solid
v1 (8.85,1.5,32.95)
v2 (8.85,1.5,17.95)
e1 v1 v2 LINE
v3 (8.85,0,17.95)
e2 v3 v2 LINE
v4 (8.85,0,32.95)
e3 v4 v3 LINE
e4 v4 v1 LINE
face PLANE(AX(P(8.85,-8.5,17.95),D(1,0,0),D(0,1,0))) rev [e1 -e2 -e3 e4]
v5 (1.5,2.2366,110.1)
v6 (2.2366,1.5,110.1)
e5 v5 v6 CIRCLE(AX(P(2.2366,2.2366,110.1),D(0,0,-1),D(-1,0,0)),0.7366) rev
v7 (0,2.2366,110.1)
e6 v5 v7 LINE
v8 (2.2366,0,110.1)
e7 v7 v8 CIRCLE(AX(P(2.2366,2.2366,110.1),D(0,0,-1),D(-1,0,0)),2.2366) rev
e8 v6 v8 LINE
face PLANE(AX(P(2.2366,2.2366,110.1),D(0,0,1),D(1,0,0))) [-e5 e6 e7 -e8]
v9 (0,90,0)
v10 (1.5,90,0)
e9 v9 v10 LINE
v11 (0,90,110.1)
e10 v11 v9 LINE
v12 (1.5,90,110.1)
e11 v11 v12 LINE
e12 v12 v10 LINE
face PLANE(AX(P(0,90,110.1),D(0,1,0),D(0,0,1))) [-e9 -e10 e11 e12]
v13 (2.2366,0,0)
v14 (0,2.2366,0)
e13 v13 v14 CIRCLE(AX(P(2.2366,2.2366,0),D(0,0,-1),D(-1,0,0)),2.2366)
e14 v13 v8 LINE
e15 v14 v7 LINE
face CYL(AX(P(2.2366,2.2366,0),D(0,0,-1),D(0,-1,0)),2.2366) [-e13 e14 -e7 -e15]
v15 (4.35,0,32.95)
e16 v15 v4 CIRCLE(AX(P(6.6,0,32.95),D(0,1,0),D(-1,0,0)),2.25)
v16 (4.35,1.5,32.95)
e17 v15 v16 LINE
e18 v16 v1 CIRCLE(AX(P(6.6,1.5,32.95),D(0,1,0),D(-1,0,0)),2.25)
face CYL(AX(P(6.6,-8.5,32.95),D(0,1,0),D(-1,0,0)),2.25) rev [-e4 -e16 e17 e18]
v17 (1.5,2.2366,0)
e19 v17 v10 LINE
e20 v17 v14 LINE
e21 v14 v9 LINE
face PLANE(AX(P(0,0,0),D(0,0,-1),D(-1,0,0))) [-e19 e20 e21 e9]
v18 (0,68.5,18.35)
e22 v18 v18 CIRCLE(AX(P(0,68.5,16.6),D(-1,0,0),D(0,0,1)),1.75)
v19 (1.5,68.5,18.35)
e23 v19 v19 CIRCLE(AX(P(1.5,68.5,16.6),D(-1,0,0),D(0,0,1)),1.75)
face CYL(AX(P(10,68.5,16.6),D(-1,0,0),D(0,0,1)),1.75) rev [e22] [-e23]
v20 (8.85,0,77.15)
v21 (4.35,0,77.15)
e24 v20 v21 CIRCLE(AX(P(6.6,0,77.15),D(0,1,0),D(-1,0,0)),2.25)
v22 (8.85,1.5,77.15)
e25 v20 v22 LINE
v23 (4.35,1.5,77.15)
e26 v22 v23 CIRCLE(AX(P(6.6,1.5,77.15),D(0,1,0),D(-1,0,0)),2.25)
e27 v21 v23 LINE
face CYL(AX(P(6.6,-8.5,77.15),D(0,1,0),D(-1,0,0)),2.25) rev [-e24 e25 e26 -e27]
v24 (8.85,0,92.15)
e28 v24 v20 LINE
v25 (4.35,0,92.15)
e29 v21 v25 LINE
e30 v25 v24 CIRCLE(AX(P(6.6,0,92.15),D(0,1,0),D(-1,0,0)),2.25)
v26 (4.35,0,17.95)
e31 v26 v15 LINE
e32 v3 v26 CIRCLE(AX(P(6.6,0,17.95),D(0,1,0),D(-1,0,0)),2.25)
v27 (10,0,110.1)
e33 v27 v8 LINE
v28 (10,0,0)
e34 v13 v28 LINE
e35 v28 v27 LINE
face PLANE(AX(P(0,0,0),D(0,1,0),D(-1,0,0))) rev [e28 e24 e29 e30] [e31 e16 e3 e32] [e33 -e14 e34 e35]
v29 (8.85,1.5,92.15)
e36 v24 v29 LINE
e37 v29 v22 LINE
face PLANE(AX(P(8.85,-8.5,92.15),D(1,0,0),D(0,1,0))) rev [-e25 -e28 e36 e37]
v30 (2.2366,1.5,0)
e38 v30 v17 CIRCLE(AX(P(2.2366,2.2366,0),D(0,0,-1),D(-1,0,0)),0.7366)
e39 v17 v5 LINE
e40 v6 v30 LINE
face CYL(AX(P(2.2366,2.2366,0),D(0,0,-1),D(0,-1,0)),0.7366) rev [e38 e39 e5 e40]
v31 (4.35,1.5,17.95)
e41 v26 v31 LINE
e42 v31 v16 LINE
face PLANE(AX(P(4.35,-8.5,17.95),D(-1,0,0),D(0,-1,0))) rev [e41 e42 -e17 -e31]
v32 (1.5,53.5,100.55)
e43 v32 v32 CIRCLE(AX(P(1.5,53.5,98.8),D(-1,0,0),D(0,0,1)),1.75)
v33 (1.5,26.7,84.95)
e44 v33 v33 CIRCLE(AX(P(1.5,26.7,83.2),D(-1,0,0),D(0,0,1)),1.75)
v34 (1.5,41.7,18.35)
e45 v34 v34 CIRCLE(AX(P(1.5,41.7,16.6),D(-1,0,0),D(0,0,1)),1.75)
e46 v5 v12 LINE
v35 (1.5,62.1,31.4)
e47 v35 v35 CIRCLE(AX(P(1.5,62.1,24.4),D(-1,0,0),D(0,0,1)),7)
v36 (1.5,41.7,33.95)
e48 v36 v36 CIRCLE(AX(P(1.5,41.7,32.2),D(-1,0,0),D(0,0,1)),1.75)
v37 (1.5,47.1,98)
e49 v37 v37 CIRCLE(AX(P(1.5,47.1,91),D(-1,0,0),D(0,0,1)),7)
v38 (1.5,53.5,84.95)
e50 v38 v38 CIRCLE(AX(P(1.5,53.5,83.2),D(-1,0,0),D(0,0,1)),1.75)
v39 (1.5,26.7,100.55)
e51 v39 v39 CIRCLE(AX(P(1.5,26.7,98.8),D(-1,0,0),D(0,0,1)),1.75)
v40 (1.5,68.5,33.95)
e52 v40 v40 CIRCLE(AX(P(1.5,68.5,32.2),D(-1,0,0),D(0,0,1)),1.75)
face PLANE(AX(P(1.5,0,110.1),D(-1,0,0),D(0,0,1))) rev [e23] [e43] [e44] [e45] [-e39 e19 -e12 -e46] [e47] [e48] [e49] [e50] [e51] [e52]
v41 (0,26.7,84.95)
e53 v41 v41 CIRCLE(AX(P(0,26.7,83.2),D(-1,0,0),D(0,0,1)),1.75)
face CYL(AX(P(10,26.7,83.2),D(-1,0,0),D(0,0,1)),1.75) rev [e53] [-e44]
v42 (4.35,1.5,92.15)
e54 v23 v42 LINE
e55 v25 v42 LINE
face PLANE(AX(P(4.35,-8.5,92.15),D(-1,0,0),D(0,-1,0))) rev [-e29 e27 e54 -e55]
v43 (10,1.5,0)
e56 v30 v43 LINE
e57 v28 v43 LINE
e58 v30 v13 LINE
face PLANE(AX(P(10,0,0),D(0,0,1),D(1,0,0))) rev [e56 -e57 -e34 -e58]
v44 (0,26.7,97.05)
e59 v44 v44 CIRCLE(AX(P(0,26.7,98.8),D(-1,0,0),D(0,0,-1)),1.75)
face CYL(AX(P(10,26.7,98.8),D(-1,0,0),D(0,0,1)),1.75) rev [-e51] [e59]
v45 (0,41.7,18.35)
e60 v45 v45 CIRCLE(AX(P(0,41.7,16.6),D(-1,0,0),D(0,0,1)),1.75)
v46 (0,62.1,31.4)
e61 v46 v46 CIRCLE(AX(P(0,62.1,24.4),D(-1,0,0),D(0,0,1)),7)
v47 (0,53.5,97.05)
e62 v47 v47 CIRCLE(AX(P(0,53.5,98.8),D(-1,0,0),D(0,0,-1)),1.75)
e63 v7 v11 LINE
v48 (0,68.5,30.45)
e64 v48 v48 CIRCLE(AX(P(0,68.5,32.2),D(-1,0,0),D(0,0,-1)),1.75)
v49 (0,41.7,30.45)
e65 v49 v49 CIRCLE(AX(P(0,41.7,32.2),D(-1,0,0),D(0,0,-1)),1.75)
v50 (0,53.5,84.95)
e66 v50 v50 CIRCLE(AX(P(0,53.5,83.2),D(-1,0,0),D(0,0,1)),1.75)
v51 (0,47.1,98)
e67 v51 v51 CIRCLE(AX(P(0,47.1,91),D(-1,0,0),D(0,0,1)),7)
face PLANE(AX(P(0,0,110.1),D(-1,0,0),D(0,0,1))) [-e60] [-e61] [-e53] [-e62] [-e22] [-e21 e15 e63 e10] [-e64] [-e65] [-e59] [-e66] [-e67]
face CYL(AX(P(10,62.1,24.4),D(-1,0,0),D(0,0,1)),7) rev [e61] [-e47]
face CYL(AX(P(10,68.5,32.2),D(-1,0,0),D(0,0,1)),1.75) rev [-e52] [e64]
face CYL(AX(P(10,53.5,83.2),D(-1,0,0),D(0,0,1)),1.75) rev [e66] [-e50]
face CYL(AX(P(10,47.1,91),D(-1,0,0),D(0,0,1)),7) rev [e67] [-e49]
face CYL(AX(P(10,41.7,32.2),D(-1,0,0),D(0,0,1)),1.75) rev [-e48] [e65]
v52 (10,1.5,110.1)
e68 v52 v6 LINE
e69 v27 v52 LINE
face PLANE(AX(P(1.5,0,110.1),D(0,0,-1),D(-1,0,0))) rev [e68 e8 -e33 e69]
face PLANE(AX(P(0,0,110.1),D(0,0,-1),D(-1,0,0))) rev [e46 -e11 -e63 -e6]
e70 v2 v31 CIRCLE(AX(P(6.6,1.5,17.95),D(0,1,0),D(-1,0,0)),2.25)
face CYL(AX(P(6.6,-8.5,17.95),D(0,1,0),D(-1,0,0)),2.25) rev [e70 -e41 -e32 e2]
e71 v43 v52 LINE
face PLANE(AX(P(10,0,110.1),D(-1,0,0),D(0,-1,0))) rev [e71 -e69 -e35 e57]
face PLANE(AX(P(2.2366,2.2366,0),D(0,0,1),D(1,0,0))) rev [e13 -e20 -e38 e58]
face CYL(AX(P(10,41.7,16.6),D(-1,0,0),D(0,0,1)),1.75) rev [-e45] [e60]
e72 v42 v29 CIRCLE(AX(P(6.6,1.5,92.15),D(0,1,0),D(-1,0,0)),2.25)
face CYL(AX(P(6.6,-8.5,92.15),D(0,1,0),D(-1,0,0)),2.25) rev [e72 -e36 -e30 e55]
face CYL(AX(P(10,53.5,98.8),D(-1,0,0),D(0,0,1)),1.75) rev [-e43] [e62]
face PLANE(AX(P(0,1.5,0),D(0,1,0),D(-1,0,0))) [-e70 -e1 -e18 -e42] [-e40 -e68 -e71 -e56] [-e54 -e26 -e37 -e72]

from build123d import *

# Parameters (mm, degrees)
SKETCH_1_W                       = 1.5
SKETCH_1_H                       = 90
SM_BASE_FLANGE_1_DEPTH           = 110.1
SKETCH_6_R                       = 7
SKETCH_6_R_2                     = 1.75
CUT_EXTRUDE_1_DEPTH              = 10
SM_EDGE_FLANGE_1_STRIP_W         = 7.4732
SM_EDGE_FLANGE_1_STRIP_H         = 1.5
SM_EDGE_FLANGE_1_STRIP_CUT_DEPTH = 110.1
SM_EDGE_FLANGE_1_DEPTH           = 110.1
CUT_EXTRUDE_2_DEPTH              = 10


# Sheet-metal steps are written as plain solids
with BuildPart() as part:
    # Sketch 1 → 基体-法兰1 (new body)
    with BuildSketch(Plane.XY):
        with Locations((0.75, 45)):
            Rectangle(SKETCH_1_W, SKETCH_1_H)
    extrude(amount=SM_BASE_FLANGE_1_DEPTH)

    # 草图6 → 切除-拉伸1 (cut)
    with BuildSketch(Plane.ZY):
        with Locations((24.4, 62.1)):
            Circle(SKETCH_6_R)
        with Locations((91, 47.1)):
            Circle(SKETCH_6_R)
        with Locations((16.6, 68.5)):
            Circle(SKETCH_6_R_2)
        with Locations((16.6, 41.7)):
            Circle(SKETCH_6_R_2)
        with Locations((32.2, 41.7)):
            Circle(SKETCH_6_R_2)
        with Locations((32.2, 68.5)):
            Circle(SKETCH_6_R_2)
        with Locations((83.2, 53.5)):
            Circle(SKETCH_6_R_2)
        with Locations((83.2, 26.7)):
            Circle(SKETCH_6_R_2)
        with Locations((98.8, 26.7)):
            Circle(SKETCH_6_R_2)
        with Locations((98.8, 53.5)):
            Circle(SKETCH_6_R_2)
    extrude(amount=-CUT_EXTRUDE_1_DEPTH, mode=Mode.SUBTRACT)

    # 边线-法兰1 strip (across the edge) → 边线-法兰1 strip cut (cut)
    with BuildSketch(Plane(origin=(1.5, 0, 110.1), x_dir=(0, 1, 0), z_dir=(0, 0, -1))):
        with Locations((-1.5, -0.75)):
            Rectangle(SM_EDGE_FLANGE_1_STRIP_W, SM_EDGE_FLANGE_1_STRIP_H)
    extrude(amount=SM_EDGE_FLANGE_1_STRIP_CUT_DEPTH, mode=Mode.SUBTRACT)

    # 边线-法兰1 section (across the edge) → 边线-法兰1 (add)
    with BuildSketch(Plane(origin=(1.5, 0, 110.1), x_dir=(0, 1, 0), z_dir=(0, 0, -1))):
        with BuildLine():
            Line((0, 0.7366), (0, 8.5))
            Line((0, 8.5), (1.5, 8.5))
            Line((1.5, 8.5), (1.5, 0.7366))
            ThreePointArc((1.5, 0.7366), (1.715745145, 0.215745145), (2.2366, 0))
            Line((2.2366, 0), (2.2366, -1.5))
            ThreePointArc((2.2366, -1.5), (0.655084973, -0.844915027), (0, 0.7366))
        make_face()
    extrude(amount=SM_EDGE_FLANGE_1_DEPTH)

    # 草图10 → 切除-拉伸2 (cut)
    with BuildSketch(Plane(origin=(0, 1.5, 0), x_dir=(1, 0, 0), z_dir=(0, 1, 0))):
        with BuildLine():
            Line((8.85, -17.95), (8.85, -32.95))
            ThreePointArc((8.85, -32.95), (6.6, -35.2), (4.35, -32.95))
            Line((4.35, -32.95), (4.35, -17.95))
            ThreePointArc((4.35, -17.95), (6.6, -15.700000154), (8.85, -17.95))
        make_face()
        with BuildLine():
            Line((4.35, -92.15), (4.35, -77.15))
            ThreePointArc((4.35, -77.15), (6.6, -74.899999913), (8.85, -77.15))
            Line((8.85, -77.15), (8.85, -92.15))
            ThreePointArc((8.85, -92.15), (6.6, -94.4), (4.35, -92.15))
        make_face()
    extrude(amount=-CUT_EXTRUDE_2_DEPTH, mode=Mode.SUBTRACT)


solid = part.part
